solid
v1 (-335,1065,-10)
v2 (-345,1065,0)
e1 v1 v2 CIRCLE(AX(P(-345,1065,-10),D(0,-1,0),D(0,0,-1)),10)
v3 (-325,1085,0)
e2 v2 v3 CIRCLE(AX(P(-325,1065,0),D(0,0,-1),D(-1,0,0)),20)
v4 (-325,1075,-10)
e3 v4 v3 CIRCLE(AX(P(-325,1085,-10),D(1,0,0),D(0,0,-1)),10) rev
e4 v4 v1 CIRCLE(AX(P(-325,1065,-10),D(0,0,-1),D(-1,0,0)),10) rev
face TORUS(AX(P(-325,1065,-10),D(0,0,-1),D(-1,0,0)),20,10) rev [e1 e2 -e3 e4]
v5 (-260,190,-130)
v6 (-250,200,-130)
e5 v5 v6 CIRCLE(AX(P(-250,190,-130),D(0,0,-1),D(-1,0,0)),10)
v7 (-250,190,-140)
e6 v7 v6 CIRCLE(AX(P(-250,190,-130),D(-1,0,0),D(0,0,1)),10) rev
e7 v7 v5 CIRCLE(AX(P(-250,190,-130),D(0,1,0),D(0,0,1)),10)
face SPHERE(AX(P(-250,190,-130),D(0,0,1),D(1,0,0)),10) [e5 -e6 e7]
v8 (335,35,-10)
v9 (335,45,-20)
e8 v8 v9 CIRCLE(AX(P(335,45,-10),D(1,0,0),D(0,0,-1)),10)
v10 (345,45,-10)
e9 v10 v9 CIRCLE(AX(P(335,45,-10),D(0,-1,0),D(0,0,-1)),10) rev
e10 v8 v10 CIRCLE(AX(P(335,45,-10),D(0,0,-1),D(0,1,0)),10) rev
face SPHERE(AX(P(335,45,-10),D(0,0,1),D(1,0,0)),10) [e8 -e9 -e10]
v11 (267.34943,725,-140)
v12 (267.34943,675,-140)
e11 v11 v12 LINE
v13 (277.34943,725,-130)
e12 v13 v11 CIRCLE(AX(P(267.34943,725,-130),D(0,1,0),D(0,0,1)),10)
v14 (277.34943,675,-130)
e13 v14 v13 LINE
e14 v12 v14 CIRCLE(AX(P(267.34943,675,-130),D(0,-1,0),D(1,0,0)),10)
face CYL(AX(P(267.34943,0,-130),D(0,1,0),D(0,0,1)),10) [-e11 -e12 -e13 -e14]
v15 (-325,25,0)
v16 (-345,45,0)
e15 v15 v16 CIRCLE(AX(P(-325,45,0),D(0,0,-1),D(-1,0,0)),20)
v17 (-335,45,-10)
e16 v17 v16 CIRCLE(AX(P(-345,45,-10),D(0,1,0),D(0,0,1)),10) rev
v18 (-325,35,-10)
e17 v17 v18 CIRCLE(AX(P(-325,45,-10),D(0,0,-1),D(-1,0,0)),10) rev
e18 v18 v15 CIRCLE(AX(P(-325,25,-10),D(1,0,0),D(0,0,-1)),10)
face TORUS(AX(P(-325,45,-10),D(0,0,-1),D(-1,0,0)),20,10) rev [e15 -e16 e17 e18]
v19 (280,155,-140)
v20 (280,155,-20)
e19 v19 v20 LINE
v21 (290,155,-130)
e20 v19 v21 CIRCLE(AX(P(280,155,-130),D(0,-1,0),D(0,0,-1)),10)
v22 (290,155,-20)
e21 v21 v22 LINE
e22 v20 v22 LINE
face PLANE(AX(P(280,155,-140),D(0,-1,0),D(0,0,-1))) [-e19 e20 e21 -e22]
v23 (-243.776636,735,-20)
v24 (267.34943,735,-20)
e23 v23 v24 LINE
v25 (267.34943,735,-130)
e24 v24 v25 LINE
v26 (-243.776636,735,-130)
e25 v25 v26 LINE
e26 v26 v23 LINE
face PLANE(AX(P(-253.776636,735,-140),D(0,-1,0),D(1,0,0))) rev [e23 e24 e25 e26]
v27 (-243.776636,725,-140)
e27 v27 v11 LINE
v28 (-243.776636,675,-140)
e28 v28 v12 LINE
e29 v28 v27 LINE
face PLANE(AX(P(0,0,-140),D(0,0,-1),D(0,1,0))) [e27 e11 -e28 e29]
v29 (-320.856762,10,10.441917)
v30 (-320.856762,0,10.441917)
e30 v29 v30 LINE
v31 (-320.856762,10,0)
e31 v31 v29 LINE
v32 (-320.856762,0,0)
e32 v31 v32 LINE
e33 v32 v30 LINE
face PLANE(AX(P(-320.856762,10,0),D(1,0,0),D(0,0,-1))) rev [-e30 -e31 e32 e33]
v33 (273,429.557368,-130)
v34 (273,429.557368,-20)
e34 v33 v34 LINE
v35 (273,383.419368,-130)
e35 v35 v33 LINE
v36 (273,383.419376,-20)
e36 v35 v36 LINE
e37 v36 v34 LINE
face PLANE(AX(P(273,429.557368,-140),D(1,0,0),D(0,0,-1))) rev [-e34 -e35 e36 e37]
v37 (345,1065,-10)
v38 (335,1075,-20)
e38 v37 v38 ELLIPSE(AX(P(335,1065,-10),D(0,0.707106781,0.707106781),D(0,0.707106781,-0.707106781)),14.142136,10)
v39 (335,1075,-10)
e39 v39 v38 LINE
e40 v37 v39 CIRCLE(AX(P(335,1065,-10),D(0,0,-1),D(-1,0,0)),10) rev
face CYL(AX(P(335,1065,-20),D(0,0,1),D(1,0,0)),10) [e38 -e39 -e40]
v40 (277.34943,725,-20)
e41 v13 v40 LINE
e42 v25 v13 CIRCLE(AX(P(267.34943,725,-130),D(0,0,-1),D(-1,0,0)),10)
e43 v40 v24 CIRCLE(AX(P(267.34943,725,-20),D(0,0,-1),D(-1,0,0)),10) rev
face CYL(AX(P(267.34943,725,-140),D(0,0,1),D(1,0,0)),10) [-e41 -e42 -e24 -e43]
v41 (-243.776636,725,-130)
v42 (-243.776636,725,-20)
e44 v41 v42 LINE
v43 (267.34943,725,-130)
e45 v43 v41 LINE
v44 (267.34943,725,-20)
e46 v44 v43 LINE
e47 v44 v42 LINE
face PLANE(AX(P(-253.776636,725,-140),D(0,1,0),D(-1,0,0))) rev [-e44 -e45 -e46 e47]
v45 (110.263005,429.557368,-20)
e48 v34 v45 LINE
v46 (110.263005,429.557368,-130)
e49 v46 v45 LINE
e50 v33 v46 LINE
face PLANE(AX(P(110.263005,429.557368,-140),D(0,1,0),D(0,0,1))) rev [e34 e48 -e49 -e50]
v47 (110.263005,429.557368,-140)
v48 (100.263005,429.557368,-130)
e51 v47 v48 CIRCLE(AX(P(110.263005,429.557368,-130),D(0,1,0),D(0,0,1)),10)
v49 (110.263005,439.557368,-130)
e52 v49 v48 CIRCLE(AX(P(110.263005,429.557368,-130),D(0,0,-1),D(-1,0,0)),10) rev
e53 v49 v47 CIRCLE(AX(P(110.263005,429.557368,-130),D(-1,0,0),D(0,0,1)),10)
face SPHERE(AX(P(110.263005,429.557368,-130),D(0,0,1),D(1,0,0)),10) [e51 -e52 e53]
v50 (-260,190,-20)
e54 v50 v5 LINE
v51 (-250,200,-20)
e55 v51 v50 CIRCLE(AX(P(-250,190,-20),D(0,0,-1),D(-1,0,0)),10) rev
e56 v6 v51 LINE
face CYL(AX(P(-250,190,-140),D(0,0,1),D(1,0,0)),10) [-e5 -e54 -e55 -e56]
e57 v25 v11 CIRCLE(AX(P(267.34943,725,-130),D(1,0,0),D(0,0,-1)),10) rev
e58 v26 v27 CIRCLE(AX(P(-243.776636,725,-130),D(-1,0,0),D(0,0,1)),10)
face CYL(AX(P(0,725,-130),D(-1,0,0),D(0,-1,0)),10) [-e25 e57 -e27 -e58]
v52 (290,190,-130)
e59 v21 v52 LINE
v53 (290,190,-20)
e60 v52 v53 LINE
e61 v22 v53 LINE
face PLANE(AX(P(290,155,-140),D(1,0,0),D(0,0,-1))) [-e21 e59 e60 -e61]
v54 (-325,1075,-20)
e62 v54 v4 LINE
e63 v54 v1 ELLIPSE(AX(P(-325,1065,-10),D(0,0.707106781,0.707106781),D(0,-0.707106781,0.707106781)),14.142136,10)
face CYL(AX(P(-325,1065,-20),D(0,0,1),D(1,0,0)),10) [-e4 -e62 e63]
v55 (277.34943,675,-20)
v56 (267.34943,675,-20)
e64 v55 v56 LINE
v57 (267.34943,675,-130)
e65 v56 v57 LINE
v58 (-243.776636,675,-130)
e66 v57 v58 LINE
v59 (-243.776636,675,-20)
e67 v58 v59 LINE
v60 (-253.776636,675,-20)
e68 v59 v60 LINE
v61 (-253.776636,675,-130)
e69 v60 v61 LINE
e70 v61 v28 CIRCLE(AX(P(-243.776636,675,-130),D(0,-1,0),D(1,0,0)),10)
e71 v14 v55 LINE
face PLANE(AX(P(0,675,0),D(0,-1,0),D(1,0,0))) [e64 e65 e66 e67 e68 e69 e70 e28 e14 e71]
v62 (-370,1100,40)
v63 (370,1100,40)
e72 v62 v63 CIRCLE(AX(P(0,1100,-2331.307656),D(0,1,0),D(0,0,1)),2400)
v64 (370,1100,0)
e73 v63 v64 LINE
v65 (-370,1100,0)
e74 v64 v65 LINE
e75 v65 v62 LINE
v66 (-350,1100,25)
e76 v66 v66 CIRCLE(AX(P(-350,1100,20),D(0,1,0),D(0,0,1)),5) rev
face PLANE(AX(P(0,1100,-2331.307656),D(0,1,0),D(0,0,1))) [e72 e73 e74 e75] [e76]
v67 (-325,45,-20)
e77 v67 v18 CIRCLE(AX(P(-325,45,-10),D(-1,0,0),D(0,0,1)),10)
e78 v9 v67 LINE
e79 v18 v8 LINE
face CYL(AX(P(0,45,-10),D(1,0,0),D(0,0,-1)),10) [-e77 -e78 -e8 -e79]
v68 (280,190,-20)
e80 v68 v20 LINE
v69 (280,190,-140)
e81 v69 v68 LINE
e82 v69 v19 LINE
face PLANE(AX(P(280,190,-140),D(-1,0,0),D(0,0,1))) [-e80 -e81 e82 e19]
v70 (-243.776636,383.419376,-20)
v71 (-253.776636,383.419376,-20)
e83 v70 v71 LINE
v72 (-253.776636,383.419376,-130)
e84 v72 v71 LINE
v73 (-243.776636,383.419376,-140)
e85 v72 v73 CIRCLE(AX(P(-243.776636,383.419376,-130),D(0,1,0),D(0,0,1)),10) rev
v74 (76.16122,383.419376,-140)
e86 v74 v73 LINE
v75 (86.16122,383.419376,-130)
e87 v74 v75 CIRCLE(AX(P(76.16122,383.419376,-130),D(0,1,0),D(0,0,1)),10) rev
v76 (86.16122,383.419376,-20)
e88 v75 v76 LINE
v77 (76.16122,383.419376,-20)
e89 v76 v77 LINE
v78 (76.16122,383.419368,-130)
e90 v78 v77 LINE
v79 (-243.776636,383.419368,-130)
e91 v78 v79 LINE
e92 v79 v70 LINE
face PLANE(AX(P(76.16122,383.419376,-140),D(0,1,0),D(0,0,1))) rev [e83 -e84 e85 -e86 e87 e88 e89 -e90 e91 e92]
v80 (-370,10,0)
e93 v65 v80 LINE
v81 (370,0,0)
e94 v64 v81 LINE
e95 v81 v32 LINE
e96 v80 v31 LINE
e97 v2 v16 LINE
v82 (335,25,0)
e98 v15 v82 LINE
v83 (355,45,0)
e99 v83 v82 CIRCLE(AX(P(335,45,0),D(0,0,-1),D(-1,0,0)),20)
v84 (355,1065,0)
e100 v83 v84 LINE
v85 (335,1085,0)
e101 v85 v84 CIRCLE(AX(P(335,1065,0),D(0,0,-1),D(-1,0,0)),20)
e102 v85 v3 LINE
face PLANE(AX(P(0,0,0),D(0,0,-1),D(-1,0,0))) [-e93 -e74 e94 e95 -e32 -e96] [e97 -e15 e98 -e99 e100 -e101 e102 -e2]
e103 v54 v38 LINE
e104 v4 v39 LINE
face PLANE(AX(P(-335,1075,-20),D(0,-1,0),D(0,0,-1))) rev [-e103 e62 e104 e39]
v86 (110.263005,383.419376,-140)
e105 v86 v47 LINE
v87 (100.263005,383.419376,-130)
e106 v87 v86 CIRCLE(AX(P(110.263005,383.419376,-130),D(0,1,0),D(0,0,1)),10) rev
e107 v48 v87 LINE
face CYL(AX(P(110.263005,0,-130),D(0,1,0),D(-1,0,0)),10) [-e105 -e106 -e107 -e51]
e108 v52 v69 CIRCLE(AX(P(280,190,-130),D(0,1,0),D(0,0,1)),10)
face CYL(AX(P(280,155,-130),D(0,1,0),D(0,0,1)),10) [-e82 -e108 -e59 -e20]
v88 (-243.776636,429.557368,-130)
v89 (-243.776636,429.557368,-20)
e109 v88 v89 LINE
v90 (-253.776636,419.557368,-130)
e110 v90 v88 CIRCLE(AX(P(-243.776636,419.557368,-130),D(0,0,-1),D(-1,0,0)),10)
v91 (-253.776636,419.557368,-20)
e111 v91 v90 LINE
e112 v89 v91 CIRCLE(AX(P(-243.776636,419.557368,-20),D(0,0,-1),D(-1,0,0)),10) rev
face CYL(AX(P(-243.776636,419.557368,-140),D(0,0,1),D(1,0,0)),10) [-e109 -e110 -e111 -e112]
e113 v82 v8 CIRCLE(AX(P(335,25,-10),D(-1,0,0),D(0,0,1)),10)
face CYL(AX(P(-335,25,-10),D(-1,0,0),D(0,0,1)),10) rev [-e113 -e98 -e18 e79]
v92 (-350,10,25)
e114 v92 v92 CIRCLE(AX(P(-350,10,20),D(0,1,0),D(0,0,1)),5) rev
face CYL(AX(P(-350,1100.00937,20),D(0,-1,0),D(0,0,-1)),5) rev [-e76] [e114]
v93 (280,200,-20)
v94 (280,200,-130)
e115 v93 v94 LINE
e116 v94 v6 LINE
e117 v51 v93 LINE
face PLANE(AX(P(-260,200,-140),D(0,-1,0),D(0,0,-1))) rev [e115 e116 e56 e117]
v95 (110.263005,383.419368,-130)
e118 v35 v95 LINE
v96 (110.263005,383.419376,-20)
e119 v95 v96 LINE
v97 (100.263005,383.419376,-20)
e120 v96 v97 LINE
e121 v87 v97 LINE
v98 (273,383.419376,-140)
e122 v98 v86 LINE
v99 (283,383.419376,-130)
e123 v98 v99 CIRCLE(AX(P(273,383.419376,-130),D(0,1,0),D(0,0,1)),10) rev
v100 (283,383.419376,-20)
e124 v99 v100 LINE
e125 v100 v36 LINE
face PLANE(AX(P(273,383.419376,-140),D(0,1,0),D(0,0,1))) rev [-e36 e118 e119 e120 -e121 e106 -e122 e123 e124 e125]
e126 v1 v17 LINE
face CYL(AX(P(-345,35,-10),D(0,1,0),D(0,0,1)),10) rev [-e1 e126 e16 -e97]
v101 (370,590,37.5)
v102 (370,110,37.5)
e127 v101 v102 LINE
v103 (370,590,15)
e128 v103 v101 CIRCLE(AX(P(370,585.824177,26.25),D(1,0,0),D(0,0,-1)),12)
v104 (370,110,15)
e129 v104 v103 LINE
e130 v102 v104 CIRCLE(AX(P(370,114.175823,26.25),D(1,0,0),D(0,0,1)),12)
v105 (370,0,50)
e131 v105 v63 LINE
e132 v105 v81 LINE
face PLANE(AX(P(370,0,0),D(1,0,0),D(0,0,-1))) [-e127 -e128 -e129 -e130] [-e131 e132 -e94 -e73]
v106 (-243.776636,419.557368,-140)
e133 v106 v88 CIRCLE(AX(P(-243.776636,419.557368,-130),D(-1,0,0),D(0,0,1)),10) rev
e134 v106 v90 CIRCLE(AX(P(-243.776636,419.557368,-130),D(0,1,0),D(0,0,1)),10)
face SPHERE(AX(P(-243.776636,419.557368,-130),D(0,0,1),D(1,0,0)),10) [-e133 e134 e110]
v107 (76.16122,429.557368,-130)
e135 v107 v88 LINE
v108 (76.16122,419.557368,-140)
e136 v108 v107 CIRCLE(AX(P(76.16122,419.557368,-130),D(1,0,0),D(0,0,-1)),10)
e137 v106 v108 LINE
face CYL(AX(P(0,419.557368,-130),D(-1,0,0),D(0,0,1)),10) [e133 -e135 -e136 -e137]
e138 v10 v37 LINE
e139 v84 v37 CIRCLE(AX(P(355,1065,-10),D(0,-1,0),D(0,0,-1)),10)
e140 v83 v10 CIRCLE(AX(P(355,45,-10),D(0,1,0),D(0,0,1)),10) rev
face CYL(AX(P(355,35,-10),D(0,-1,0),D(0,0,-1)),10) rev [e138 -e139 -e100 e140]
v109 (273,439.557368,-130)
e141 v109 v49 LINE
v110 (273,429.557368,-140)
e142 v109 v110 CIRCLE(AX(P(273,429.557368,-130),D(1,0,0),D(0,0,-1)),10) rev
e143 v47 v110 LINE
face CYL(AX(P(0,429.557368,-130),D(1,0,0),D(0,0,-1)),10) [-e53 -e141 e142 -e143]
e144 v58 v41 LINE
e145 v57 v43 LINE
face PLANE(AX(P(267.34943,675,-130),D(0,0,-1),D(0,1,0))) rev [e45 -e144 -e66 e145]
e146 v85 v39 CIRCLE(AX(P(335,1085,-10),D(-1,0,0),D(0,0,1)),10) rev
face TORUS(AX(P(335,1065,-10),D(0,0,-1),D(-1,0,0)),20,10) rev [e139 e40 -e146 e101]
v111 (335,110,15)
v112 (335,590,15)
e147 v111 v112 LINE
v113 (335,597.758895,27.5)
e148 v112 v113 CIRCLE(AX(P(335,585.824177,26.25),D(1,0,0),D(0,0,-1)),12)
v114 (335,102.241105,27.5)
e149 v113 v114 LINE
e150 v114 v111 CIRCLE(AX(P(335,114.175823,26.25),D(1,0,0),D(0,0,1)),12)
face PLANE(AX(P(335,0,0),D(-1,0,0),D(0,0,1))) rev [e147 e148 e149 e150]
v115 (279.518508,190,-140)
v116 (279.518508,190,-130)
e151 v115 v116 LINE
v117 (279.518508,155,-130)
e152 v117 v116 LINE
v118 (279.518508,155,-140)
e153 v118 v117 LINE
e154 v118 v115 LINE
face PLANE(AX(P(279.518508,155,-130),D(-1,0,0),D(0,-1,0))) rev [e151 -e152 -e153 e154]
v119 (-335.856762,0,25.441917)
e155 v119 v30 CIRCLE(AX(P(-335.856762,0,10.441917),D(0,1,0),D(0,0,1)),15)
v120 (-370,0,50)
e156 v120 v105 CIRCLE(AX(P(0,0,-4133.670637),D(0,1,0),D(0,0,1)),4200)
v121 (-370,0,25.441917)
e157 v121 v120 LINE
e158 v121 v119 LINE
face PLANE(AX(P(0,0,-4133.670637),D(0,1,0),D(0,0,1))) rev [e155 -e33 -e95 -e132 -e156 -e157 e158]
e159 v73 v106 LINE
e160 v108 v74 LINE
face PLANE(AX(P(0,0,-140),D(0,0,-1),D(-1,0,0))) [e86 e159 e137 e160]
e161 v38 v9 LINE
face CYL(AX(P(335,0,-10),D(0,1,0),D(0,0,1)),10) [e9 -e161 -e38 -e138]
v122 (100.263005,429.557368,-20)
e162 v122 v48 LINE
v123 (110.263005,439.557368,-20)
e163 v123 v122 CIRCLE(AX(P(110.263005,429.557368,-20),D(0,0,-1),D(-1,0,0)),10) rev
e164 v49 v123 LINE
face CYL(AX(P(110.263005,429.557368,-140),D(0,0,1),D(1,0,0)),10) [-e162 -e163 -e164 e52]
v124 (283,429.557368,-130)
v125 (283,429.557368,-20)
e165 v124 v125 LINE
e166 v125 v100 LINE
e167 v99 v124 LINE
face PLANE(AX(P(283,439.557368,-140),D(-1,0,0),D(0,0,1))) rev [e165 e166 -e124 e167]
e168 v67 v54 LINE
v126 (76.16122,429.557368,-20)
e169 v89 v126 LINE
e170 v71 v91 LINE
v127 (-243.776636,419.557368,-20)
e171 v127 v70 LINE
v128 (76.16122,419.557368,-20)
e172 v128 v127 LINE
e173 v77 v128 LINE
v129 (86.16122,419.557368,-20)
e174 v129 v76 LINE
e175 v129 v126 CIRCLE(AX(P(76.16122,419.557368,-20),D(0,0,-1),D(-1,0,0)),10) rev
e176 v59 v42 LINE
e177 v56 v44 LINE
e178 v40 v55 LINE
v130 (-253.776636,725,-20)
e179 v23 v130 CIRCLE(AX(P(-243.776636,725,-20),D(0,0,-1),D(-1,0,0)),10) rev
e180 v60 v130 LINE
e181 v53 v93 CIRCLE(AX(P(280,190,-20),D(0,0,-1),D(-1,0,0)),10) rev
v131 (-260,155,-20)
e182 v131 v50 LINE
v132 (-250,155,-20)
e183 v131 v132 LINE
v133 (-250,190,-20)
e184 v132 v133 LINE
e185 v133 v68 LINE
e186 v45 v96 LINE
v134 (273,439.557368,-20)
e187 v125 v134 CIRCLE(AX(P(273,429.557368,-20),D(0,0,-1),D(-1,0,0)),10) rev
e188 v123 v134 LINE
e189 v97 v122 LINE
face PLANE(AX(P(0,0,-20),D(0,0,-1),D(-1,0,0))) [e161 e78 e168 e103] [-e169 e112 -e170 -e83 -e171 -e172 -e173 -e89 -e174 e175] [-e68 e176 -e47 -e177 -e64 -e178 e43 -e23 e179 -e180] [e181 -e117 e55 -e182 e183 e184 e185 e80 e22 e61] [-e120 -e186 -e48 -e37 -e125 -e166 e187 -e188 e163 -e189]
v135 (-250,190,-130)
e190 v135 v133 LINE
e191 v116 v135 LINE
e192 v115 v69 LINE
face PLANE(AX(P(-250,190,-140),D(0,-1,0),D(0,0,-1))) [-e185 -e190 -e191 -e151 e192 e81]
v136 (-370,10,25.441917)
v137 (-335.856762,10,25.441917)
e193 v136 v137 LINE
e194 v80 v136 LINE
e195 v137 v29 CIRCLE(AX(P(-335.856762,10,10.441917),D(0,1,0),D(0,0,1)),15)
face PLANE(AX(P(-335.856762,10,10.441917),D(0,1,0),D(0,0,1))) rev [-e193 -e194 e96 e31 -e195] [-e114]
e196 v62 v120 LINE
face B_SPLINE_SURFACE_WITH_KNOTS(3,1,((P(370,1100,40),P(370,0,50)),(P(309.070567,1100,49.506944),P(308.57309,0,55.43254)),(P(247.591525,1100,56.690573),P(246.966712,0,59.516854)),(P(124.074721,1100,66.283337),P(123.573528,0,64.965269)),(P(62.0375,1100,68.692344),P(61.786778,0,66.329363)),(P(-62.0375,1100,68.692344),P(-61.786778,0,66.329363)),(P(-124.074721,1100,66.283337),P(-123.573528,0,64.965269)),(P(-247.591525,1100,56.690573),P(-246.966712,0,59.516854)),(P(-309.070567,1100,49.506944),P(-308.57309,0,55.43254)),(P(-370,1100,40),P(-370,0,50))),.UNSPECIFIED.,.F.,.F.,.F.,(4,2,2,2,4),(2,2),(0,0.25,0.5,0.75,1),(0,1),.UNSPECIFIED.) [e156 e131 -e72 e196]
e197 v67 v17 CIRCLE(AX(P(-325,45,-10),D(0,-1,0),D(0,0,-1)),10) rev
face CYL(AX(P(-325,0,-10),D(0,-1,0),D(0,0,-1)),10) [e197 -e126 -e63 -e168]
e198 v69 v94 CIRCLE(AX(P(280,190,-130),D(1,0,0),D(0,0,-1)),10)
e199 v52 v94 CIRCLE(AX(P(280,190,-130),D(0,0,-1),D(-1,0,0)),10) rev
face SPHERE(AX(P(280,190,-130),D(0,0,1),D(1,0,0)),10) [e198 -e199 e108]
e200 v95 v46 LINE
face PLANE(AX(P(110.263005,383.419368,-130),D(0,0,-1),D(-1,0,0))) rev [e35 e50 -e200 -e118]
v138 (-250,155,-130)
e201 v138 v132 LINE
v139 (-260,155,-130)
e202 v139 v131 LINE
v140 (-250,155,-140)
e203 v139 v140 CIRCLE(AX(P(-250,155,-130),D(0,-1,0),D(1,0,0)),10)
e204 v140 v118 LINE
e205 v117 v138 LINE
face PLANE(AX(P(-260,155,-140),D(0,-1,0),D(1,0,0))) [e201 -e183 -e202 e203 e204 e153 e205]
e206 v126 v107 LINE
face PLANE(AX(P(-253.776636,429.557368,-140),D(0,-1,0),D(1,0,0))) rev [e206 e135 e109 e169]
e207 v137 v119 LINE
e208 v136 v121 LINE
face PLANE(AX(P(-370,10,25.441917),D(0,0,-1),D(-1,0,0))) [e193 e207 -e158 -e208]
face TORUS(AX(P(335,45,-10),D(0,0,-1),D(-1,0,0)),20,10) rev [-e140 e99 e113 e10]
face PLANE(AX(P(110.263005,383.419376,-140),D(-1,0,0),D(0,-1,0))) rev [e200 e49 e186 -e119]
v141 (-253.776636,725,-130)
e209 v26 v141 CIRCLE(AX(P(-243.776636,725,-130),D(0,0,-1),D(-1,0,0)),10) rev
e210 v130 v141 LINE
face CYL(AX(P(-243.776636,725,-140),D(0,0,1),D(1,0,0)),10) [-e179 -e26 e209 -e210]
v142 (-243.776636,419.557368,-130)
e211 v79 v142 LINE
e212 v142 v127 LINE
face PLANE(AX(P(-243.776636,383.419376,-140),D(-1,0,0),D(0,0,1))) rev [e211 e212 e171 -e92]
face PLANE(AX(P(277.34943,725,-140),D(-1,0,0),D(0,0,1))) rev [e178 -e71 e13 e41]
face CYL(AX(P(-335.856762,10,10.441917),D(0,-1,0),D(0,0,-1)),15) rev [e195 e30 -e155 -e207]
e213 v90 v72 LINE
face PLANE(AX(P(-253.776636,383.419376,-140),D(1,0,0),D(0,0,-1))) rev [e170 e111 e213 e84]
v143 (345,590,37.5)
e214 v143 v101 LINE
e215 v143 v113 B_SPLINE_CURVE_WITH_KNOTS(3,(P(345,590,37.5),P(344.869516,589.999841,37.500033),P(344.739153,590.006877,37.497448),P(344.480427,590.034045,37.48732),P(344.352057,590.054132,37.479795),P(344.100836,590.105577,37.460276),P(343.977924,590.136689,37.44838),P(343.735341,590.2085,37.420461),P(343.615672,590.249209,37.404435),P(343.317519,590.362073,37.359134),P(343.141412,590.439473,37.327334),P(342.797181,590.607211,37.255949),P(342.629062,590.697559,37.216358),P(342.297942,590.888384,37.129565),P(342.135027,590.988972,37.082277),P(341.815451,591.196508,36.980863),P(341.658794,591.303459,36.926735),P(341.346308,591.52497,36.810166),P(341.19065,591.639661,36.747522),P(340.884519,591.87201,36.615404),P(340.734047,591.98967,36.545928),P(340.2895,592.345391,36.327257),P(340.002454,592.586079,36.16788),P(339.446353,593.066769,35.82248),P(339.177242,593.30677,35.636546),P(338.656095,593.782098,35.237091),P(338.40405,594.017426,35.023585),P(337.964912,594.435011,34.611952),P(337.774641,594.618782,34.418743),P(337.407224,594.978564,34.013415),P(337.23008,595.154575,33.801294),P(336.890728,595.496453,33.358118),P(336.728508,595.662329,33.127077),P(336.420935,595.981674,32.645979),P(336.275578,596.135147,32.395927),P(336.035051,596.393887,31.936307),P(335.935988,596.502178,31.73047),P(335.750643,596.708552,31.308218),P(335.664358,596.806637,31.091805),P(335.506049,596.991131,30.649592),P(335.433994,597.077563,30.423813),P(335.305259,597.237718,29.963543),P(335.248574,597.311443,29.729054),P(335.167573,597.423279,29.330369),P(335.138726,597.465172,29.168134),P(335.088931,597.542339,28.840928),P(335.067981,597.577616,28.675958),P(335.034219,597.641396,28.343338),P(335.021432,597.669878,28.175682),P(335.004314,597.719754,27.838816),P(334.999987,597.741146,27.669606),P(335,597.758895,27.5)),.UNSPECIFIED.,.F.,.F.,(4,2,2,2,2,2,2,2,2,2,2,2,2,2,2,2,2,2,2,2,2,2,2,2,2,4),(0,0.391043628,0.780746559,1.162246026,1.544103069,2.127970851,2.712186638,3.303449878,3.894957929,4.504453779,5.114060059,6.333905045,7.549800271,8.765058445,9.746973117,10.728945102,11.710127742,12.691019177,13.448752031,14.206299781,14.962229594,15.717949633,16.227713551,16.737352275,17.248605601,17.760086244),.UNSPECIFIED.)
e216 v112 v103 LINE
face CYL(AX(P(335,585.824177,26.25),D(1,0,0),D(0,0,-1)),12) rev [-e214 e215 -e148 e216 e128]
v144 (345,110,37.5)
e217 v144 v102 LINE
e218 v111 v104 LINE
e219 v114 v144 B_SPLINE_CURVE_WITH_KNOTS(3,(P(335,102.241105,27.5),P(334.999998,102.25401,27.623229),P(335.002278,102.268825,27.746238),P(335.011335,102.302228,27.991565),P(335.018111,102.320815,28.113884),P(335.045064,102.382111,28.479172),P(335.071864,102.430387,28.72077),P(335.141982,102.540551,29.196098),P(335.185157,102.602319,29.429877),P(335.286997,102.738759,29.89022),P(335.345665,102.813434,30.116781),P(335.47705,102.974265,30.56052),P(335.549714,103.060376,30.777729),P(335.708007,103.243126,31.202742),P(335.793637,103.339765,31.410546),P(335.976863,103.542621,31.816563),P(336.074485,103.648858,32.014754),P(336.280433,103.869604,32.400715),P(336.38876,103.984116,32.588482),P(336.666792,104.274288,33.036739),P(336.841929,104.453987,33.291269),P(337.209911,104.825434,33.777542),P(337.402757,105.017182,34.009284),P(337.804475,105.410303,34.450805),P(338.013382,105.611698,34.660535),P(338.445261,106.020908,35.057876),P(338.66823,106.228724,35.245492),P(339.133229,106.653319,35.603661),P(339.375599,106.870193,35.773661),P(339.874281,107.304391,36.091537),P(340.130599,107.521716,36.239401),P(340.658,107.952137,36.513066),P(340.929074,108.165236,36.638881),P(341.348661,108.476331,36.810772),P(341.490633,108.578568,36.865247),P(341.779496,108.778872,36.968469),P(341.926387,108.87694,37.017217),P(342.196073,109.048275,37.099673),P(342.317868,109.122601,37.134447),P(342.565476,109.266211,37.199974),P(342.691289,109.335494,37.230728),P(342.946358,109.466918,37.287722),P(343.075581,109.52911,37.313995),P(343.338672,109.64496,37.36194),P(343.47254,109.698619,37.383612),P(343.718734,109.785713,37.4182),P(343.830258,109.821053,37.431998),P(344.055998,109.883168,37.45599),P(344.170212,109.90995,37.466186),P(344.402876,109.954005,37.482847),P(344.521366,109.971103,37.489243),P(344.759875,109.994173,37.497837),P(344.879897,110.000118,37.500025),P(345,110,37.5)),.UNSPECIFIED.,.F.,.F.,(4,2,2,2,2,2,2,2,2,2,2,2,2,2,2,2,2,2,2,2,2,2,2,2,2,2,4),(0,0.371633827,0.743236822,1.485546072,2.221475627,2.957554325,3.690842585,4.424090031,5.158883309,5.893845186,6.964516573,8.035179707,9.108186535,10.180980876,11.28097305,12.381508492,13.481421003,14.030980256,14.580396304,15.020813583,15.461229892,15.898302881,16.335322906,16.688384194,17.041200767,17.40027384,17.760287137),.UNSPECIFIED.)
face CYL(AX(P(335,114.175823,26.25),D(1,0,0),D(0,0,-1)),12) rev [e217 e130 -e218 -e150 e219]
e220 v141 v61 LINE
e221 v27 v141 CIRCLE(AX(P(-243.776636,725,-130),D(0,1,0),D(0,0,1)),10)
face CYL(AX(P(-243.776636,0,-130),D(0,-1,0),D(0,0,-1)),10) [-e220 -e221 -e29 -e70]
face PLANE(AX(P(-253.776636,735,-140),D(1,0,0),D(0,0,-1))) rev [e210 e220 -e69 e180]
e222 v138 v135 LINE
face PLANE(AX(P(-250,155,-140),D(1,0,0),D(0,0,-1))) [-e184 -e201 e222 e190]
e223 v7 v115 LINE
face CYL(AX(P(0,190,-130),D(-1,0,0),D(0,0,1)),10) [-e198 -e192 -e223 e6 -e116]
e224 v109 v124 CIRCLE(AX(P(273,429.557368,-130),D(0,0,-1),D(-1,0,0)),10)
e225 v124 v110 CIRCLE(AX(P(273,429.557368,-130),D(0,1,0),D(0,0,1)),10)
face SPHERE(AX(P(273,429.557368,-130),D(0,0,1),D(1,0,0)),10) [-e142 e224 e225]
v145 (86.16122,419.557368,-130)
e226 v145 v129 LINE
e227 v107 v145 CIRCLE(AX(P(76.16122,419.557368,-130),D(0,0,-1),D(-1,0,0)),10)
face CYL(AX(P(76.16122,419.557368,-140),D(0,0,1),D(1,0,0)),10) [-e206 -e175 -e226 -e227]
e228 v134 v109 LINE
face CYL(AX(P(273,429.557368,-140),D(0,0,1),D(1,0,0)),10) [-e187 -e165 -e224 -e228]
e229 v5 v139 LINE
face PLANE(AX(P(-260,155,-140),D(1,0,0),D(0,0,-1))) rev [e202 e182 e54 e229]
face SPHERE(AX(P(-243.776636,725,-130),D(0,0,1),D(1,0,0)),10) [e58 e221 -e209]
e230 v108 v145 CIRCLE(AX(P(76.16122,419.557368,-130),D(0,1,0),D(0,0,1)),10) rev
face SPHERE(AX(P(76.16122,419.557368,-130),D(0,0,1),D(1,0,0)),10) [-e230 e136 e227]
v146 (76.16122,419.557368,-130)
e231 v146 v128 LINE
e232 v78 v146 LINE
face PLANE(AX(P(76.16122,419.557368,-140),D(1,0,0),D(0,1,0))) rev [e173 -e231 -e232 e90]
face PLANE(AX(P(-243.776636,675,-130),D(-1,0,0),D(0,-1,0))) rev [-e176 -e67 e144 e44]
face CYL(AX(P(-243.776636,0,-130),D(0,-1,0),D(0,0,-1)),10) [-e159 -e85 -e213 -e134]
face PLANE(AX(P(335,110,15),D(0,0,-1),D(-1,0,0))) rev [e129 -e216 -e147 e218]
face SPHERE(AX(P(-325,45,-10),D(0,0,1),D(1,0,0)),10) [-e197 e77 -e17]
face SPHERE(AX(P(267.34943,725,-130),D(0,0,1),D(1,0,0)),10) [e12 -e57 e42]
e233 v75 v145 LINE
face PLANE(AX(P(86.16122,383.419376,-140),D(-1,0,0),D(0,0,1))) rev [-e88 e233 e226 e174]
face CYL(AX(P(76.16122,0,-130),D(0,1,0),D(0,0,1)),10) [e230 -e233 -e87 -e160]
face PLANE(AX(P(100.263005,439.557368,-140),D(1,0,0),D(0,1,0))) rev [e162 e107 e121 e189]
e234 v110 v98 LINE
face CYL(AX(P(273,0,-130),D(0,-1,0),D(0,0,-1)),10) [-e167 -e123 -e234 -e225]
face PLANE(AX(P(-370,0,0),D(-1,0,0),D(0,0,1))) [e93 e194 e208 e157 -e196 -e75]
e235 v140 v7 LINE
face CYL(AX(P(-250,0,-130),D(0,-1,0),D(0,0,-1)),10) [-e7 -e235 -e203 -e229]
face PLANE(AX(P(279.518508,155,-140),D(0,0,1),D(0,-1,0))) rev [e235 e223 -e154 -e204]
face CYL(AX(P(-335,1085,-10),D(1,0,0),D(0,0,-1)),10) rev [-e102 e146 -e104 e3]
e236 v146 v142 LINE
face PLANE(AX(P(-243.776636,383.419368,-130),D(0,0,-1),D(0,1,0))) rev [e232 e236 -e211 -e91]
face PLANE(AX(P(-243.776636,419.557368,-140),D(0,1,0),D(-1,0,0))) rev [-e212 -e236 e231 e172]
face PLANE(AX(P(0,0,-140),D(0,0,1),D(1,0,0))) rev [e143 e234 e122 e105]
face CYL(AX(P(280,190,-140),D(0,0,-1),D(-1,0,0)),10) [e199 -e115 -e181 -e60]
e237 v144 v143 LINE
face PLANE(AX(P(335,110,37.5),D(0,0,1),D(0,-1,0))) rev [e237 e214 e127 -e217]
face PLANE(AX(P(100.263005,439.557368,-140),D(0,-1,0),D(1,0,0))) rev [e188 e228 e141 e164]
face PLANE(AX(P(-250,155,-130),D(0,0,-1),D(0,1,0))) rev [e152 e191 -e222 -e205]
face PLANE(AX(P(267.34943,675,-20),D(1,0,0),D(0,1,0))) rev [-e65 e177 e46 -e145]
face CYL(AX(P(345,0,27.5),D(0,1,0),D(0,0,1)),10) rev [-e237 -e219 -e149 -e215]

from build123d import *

# Parameters (mm, degrees)
CORTE_EXTRUS_O3_REACH     = 1164.591
ESBO_O5_R                 = 5
CORTE_EXTRUS_O4_DEPTH     = 10
ESBO_O8_W                 = 680
ESBO_O8_H                 = 1040
RESSALTO_EXTRUS_O1_DEPTH  = 20
FILETE1_R                 = 10
ESBO_O11_W                = 22.5
ESBO_O11_H                = 480
CORTE_EXTRUS_O5_DEPTH     = 35
CORTE_EXTRUS_O6_DEPTH     = 35
FILETE15_R                = 10
RESSALTO_EXTRUS_O2_DEPTH  = 120
FILETE16_R                = 10
RESSALTO_EXTRUS_O4_DEPTH  = 120
ESBO_O16_W                = 319.937855213
ESBO_O16_H                = 10
RESSALTO_EXTRUS_O5_DEPTH  = 36.138
FILETE17_R                = 10
RESSALTO_EXTRUS_O6_DEPTH  = 120
ESBO_O18_W                = 162.736994832
ESBO_O18_H                = 10
RESSALTO_EXTRUS_O7_DEPTH  = 46.138
FILETE18_R                = 10
ESBO_O19_W                = 531.126065259
ESBO_O19_H                = 10
RESSALTO_EXTRUS_O8_DEPTH  = 120
RESSALTO_EXTRUS_O9_DEPTH  = 50
FILETE19_R                = 10
ESBO_O22_W                = 529.518507703
ESBO_O22_H                = 10
RESSALTO_EXTRUS_O10_DEPTH = 35


with BuildPart() as part:
    # Esboço2 for Loft1 → Loft1 section 0
    with BuildSketch(Plane(origin=(0, 1100, 0), x_dir=(1, 0, 0), z_dir=(0, 1, 0))):
        with BuildLine():
            Line((-370, 0), (370, 0))
            Line((370, 0), (370, -40))
            # circular arc as an exact rational Bezier (weights 1, cos(half-angle), 1)
            Bezier((370, -40), (0, -97.731859317), (-370, -40), weights=[1, 0.988044857, 1])
            Line((-370, -40), (-370, 0))
        make_face()
    # Esboço1 for Loft1 → Loft1 section 1
    with BuildSketch(Plane(origin=(0, 0, 0), x_dir=(1, 0, 0), z_dir=(0, 1, 0))):
        with BuildLine():
            Line((-370, 0), (370, 0))
            Line((370, 0), (370, -50))
            Bezier((370, -50), (0, -82.722461177), (-370, -50), weights=[1, 0.996112056, 1])
            Line((-370, -50), (-370, 0))
        make_face()
    loft()

    # Esboço5 → Corte-extrusão3 (cut, up to next)
    with BuildSketch(Plane.XZ, mode=Mode.PRIVATE) as corte_extrus_o3_sk1:
        with Locations(Location((-350, 20, 0), (0, 0, 270))):
            Circle(ESBO_O5_R)
    corte_extrus_o3_tool1 = extrude(corte_extrus_o3_sk1.sketch, amount=-CORTE_EXTRUS_O3_REACH, mode=Mode.PRIVATE) & part.part
    add(corte_extrus_o3_tool1.solids().sort_by_distance((-350, 0, 20))[0], mode=Mode.SUBTRACT)

    # Esboço6 → Corte-extrusão4 (cut)
    with BuildSketch(Plane.XZ):
        with BuildLine():
            Line((-370, 0), (-320.856761827, 0))
            Line((-320.856761827, 0), (-320.856761827, 10.441916975))
            ThreePointArc((-320.856761827, 10.441916975), (-325.250160109, 21.048518693), (-335.856761827, 25.441916975))
            Line((-335.856761827, 25.441916975), (-370, 25.441916975))
            Line((-370, 25.441916975), (-370, 0))
        make_face()
    extrude(amount=-CORTE_EXTRUS_O4_DEPTH, mode=Mode.SUBTRACT)

    # Esboço8 → Ressalto-extrusão1 (add)
    with BuildSketch(Plane(origin=(0, 0, 0), x_dir=(-1, 0, 0), z_dir=(0, 0, -1))):
        with Locations((-5, 555)):
            Rectangle(ESBO_O8_W, ESBO_O8_H)
    extrude(amount=RESSALTO_EXTRUS_O1_DEPTH)

    # Filete1
    filete1_edges = [part.edges().sort_by_distance(p)[0] for p in [
        (-335, 555, 0),
        (-335, 35, -10),
        (5, 1075, 0),
        (-335, 1075, -10),
        (345, 555, 0),
        (345, 1075, -10),
        (5, 35, 0),
        (345, 35, -10),
        (-335, 555, -20),
        (345, 555, -20),
        (5, 35, -20),
    ]]
    fillet(filete1_edges, radius=FILETE1_R - 0.0001)  # a hair under: the kernel refuses the full size

    # Esboço11 → Corte-extrusão5 (cut)
    with BuildSketch(Plane(origin=(370, 0, 0), x_dir=(0, 0, -1), z_dir=(1, 0, 0))):
        with Locations((-26.25, 350)):
            Rectangle(ESBO_O11_W, ESBO_O11_H)
    extrude(amount=-CORTE_EXTRUS_O5_DEPTH, mode=Mode.SUBTRACT)

    # Esboço12 → Corte-extrusão6 (cut)
    with BuildSketch(Plane(origin=(370, 0, 0), x_dir=(0, 0, -1), z_dir=(1, 0, 0))):
        with BuildLine():
            Line((-15, 110), (-37.5, 110))
            ThreePointArc((-37.5, 110), (-26.25, 102.175823272), (-15, 110))
        make_face()
        with BuildLine():
            Line((-15, 590), (-37.5, 590))
            ThreePointArc((-37.5, 590), (-26.25, 597.824176728), (-15, 590))
        make_face()
    extrude(amount=-CORTE_EXTRUS_O6_DEPTH, mode=Mode.SUBTRACT)

    # Filete15
    filete15_edges = [part.edges().sort_by_distance(p)[0] for p in [
        (335, 350, 37.5),
    ]]
    fillet(filete15_edges, radius=FILETE15_R)

    # Esboço13 → Ressalto-extrusão2 (add)
    with BuildSketch(Plane(origin=(0, 0, -20), x_dir=(-1, 0, 0), z_dir=(0, 0, -1))):
        Polygon((260, 155), (250, 155), (250, 190), (-280, 190), (-280, 155), (-290, 155), (-290, 200), (260, 200), align=None)
    extrude(amount=RESSALTO_EXTRUS_O2_DEPTH)

    # Filete16
    filete16_edges = [part.edges().sort_by_distance(p)[0] for p in [
        (290, 200, -80),
        (-260, 200, -80),
        (15, 200, -140),
        (-260, 177.5, -140),
        (290, 177.5, -140),
    ]]
    fillet(filete16_edges, radius=FILETE16_R - 0.0001)  # a hair under: the kernel refuses the full size

    # Esboço15 → Ressalto-extrusão4 (add)
    with BuildSketch(Plane(origin=(0, 0, -20), x_dir=(-1, 0, 0), z_dir=(0, 0, -1))):
        Polygon((253.776635588, 383.41937577), (243.776635588, 383.41937577), (243.776635588, 419.557368326), (-76.161219625, 419.557368326), (-76.161219625, 383.41937577), (-86.161219625, 383.41937577), (-86.161219625, 429.557368326), (253.776635588, 429.557368326), align=None)
    extrude(amount=RESSALTO_EXTRUS_O4_DEPTH)

    # Esboço16 → Ressalto-extrusão5 (add)
    with BuildSketch(Plane.XZ.offset(-419.557368326)):
        with Locations((-83.807707982, -135)):
            Rectangle(ESBO_O16_W, ESBO_O16_H)
    extrude(amount=RESSALTO_EXTRUS_O5_DEPTH)

    # Filete17
    filete17_edges = [part.edges().sort_by_distance(p)[0] for p in [
        (-253.776635588, 429.557368326, -80),
        (86.161219625, 429.557368326, -80),
        (-253.776635588, 406.488372048, -140),
        (-83.807707982, 429.557368326, -140),
        (86.161219625, 406.488372048, -140),
    ]]
    fillet(filete17_edges, radius=FILETE17_R - 0.0001)  # a hair under: the kernel refuses the full size

    # Esboço17 → Ressalto-extrusão6 (add)
    with BuildSketch(Plane(origin=(0, 0, -20), x_dir=(-1, 0, 0), z_dir=(0, 0, -1))):
        Polygon((-100.263005168, 439.557368326), (-283, 439.557368326), (-283, 383.41937577), (-273, 383.41937577), (-273, 429.557368326), (-110.263005168, 429.557368326), (-110.263005168, 383.41937577), (-100.263005168, 383.41937577), align=None)
    extrude(amount=RESSALTO_EXTRUS_O6_DEPTH)

    # Esboço18 → Ressalto-extrusão7 (add)
    with BuildSketch(Plane(origin=(0, 429.557368326, 0), x_dir=(-1, 0, 0), z_dir=(0, -1, 0))):
        with Locations((-191.631502584, 135)):
            Rectangle(ESBO_O18_W, ESBO_O18_H)
    extrude(amount=RESSALTO_EXTRUS_O7_DEPTH)

    # Filete18
    filete18_edges = [part.edges().sort_by_distance(p)[0] for p in [
        (100.263005168, 439.557368326, -80),
        (283, 439.557368326, -80),
        (100.263005168, 411.488372048, -140),
        (191.631502584, 439.557368326, -140),
        (283, 411.488372048, -140),
    ]]
    fillet(filete18_edges, radius=FILETE18_R - 0.0001)  # a hair under: the kernel refuses the full size

    # Esboço19 → Ressalto-extrusão8 (add)
    with BuildSketch(Plane(origin=(0, 0, -20), x_dir=(-1, 0, 0), z_dir=(0, 0, -1))):
        with Locations((-11.786397041, 730)):
            Rectangle(ESBO_O19_W, ESBO_O19_H)
    extrude(amount=RESSALTO_EXTRUS_O8_DEPTH)

    # Esboço20 → Ressalto-extrusão9 (add)
    with BuildSketch(Plane.XZ.offset(-725)):
        Polygon((-253.776635588, -20), (-253.776635588, -140), (277.349429671, -140), (277.349429671, -20), (267.349429671, -20), (267.349429671, -130), (-243.776635588, -130), (-243.776635588, -20), align=None)
    extrude(amount=RESSALTO_EXTRUS_O9_DEPTH)

    # Filete19
    filete19_edges = [part.edges().sort_by_distance(p)[0] for p in [
        (277.349429671, 735, -80),
        (-253.776635588, 735, -80),
        (277.349429671, 705, -140),
        (-253.776635588, 705, -140),
        (11.786397041, 735, -140),
    ]]
    fillet(filete19_edges, radius=FILETE19_R)

    # Esboço22 → Ressalto-extrusão10 (add)
    with BuildSketch(Plane.XZ.offset(-190)):
        with Locations((14.759253851, -135)):
            Rectangle(ESBO_O22_W, ESBO_O22_H)
    extrude(amount=RESSALTO_EXTRUS_O10_DEPTH)


solid = part.part
